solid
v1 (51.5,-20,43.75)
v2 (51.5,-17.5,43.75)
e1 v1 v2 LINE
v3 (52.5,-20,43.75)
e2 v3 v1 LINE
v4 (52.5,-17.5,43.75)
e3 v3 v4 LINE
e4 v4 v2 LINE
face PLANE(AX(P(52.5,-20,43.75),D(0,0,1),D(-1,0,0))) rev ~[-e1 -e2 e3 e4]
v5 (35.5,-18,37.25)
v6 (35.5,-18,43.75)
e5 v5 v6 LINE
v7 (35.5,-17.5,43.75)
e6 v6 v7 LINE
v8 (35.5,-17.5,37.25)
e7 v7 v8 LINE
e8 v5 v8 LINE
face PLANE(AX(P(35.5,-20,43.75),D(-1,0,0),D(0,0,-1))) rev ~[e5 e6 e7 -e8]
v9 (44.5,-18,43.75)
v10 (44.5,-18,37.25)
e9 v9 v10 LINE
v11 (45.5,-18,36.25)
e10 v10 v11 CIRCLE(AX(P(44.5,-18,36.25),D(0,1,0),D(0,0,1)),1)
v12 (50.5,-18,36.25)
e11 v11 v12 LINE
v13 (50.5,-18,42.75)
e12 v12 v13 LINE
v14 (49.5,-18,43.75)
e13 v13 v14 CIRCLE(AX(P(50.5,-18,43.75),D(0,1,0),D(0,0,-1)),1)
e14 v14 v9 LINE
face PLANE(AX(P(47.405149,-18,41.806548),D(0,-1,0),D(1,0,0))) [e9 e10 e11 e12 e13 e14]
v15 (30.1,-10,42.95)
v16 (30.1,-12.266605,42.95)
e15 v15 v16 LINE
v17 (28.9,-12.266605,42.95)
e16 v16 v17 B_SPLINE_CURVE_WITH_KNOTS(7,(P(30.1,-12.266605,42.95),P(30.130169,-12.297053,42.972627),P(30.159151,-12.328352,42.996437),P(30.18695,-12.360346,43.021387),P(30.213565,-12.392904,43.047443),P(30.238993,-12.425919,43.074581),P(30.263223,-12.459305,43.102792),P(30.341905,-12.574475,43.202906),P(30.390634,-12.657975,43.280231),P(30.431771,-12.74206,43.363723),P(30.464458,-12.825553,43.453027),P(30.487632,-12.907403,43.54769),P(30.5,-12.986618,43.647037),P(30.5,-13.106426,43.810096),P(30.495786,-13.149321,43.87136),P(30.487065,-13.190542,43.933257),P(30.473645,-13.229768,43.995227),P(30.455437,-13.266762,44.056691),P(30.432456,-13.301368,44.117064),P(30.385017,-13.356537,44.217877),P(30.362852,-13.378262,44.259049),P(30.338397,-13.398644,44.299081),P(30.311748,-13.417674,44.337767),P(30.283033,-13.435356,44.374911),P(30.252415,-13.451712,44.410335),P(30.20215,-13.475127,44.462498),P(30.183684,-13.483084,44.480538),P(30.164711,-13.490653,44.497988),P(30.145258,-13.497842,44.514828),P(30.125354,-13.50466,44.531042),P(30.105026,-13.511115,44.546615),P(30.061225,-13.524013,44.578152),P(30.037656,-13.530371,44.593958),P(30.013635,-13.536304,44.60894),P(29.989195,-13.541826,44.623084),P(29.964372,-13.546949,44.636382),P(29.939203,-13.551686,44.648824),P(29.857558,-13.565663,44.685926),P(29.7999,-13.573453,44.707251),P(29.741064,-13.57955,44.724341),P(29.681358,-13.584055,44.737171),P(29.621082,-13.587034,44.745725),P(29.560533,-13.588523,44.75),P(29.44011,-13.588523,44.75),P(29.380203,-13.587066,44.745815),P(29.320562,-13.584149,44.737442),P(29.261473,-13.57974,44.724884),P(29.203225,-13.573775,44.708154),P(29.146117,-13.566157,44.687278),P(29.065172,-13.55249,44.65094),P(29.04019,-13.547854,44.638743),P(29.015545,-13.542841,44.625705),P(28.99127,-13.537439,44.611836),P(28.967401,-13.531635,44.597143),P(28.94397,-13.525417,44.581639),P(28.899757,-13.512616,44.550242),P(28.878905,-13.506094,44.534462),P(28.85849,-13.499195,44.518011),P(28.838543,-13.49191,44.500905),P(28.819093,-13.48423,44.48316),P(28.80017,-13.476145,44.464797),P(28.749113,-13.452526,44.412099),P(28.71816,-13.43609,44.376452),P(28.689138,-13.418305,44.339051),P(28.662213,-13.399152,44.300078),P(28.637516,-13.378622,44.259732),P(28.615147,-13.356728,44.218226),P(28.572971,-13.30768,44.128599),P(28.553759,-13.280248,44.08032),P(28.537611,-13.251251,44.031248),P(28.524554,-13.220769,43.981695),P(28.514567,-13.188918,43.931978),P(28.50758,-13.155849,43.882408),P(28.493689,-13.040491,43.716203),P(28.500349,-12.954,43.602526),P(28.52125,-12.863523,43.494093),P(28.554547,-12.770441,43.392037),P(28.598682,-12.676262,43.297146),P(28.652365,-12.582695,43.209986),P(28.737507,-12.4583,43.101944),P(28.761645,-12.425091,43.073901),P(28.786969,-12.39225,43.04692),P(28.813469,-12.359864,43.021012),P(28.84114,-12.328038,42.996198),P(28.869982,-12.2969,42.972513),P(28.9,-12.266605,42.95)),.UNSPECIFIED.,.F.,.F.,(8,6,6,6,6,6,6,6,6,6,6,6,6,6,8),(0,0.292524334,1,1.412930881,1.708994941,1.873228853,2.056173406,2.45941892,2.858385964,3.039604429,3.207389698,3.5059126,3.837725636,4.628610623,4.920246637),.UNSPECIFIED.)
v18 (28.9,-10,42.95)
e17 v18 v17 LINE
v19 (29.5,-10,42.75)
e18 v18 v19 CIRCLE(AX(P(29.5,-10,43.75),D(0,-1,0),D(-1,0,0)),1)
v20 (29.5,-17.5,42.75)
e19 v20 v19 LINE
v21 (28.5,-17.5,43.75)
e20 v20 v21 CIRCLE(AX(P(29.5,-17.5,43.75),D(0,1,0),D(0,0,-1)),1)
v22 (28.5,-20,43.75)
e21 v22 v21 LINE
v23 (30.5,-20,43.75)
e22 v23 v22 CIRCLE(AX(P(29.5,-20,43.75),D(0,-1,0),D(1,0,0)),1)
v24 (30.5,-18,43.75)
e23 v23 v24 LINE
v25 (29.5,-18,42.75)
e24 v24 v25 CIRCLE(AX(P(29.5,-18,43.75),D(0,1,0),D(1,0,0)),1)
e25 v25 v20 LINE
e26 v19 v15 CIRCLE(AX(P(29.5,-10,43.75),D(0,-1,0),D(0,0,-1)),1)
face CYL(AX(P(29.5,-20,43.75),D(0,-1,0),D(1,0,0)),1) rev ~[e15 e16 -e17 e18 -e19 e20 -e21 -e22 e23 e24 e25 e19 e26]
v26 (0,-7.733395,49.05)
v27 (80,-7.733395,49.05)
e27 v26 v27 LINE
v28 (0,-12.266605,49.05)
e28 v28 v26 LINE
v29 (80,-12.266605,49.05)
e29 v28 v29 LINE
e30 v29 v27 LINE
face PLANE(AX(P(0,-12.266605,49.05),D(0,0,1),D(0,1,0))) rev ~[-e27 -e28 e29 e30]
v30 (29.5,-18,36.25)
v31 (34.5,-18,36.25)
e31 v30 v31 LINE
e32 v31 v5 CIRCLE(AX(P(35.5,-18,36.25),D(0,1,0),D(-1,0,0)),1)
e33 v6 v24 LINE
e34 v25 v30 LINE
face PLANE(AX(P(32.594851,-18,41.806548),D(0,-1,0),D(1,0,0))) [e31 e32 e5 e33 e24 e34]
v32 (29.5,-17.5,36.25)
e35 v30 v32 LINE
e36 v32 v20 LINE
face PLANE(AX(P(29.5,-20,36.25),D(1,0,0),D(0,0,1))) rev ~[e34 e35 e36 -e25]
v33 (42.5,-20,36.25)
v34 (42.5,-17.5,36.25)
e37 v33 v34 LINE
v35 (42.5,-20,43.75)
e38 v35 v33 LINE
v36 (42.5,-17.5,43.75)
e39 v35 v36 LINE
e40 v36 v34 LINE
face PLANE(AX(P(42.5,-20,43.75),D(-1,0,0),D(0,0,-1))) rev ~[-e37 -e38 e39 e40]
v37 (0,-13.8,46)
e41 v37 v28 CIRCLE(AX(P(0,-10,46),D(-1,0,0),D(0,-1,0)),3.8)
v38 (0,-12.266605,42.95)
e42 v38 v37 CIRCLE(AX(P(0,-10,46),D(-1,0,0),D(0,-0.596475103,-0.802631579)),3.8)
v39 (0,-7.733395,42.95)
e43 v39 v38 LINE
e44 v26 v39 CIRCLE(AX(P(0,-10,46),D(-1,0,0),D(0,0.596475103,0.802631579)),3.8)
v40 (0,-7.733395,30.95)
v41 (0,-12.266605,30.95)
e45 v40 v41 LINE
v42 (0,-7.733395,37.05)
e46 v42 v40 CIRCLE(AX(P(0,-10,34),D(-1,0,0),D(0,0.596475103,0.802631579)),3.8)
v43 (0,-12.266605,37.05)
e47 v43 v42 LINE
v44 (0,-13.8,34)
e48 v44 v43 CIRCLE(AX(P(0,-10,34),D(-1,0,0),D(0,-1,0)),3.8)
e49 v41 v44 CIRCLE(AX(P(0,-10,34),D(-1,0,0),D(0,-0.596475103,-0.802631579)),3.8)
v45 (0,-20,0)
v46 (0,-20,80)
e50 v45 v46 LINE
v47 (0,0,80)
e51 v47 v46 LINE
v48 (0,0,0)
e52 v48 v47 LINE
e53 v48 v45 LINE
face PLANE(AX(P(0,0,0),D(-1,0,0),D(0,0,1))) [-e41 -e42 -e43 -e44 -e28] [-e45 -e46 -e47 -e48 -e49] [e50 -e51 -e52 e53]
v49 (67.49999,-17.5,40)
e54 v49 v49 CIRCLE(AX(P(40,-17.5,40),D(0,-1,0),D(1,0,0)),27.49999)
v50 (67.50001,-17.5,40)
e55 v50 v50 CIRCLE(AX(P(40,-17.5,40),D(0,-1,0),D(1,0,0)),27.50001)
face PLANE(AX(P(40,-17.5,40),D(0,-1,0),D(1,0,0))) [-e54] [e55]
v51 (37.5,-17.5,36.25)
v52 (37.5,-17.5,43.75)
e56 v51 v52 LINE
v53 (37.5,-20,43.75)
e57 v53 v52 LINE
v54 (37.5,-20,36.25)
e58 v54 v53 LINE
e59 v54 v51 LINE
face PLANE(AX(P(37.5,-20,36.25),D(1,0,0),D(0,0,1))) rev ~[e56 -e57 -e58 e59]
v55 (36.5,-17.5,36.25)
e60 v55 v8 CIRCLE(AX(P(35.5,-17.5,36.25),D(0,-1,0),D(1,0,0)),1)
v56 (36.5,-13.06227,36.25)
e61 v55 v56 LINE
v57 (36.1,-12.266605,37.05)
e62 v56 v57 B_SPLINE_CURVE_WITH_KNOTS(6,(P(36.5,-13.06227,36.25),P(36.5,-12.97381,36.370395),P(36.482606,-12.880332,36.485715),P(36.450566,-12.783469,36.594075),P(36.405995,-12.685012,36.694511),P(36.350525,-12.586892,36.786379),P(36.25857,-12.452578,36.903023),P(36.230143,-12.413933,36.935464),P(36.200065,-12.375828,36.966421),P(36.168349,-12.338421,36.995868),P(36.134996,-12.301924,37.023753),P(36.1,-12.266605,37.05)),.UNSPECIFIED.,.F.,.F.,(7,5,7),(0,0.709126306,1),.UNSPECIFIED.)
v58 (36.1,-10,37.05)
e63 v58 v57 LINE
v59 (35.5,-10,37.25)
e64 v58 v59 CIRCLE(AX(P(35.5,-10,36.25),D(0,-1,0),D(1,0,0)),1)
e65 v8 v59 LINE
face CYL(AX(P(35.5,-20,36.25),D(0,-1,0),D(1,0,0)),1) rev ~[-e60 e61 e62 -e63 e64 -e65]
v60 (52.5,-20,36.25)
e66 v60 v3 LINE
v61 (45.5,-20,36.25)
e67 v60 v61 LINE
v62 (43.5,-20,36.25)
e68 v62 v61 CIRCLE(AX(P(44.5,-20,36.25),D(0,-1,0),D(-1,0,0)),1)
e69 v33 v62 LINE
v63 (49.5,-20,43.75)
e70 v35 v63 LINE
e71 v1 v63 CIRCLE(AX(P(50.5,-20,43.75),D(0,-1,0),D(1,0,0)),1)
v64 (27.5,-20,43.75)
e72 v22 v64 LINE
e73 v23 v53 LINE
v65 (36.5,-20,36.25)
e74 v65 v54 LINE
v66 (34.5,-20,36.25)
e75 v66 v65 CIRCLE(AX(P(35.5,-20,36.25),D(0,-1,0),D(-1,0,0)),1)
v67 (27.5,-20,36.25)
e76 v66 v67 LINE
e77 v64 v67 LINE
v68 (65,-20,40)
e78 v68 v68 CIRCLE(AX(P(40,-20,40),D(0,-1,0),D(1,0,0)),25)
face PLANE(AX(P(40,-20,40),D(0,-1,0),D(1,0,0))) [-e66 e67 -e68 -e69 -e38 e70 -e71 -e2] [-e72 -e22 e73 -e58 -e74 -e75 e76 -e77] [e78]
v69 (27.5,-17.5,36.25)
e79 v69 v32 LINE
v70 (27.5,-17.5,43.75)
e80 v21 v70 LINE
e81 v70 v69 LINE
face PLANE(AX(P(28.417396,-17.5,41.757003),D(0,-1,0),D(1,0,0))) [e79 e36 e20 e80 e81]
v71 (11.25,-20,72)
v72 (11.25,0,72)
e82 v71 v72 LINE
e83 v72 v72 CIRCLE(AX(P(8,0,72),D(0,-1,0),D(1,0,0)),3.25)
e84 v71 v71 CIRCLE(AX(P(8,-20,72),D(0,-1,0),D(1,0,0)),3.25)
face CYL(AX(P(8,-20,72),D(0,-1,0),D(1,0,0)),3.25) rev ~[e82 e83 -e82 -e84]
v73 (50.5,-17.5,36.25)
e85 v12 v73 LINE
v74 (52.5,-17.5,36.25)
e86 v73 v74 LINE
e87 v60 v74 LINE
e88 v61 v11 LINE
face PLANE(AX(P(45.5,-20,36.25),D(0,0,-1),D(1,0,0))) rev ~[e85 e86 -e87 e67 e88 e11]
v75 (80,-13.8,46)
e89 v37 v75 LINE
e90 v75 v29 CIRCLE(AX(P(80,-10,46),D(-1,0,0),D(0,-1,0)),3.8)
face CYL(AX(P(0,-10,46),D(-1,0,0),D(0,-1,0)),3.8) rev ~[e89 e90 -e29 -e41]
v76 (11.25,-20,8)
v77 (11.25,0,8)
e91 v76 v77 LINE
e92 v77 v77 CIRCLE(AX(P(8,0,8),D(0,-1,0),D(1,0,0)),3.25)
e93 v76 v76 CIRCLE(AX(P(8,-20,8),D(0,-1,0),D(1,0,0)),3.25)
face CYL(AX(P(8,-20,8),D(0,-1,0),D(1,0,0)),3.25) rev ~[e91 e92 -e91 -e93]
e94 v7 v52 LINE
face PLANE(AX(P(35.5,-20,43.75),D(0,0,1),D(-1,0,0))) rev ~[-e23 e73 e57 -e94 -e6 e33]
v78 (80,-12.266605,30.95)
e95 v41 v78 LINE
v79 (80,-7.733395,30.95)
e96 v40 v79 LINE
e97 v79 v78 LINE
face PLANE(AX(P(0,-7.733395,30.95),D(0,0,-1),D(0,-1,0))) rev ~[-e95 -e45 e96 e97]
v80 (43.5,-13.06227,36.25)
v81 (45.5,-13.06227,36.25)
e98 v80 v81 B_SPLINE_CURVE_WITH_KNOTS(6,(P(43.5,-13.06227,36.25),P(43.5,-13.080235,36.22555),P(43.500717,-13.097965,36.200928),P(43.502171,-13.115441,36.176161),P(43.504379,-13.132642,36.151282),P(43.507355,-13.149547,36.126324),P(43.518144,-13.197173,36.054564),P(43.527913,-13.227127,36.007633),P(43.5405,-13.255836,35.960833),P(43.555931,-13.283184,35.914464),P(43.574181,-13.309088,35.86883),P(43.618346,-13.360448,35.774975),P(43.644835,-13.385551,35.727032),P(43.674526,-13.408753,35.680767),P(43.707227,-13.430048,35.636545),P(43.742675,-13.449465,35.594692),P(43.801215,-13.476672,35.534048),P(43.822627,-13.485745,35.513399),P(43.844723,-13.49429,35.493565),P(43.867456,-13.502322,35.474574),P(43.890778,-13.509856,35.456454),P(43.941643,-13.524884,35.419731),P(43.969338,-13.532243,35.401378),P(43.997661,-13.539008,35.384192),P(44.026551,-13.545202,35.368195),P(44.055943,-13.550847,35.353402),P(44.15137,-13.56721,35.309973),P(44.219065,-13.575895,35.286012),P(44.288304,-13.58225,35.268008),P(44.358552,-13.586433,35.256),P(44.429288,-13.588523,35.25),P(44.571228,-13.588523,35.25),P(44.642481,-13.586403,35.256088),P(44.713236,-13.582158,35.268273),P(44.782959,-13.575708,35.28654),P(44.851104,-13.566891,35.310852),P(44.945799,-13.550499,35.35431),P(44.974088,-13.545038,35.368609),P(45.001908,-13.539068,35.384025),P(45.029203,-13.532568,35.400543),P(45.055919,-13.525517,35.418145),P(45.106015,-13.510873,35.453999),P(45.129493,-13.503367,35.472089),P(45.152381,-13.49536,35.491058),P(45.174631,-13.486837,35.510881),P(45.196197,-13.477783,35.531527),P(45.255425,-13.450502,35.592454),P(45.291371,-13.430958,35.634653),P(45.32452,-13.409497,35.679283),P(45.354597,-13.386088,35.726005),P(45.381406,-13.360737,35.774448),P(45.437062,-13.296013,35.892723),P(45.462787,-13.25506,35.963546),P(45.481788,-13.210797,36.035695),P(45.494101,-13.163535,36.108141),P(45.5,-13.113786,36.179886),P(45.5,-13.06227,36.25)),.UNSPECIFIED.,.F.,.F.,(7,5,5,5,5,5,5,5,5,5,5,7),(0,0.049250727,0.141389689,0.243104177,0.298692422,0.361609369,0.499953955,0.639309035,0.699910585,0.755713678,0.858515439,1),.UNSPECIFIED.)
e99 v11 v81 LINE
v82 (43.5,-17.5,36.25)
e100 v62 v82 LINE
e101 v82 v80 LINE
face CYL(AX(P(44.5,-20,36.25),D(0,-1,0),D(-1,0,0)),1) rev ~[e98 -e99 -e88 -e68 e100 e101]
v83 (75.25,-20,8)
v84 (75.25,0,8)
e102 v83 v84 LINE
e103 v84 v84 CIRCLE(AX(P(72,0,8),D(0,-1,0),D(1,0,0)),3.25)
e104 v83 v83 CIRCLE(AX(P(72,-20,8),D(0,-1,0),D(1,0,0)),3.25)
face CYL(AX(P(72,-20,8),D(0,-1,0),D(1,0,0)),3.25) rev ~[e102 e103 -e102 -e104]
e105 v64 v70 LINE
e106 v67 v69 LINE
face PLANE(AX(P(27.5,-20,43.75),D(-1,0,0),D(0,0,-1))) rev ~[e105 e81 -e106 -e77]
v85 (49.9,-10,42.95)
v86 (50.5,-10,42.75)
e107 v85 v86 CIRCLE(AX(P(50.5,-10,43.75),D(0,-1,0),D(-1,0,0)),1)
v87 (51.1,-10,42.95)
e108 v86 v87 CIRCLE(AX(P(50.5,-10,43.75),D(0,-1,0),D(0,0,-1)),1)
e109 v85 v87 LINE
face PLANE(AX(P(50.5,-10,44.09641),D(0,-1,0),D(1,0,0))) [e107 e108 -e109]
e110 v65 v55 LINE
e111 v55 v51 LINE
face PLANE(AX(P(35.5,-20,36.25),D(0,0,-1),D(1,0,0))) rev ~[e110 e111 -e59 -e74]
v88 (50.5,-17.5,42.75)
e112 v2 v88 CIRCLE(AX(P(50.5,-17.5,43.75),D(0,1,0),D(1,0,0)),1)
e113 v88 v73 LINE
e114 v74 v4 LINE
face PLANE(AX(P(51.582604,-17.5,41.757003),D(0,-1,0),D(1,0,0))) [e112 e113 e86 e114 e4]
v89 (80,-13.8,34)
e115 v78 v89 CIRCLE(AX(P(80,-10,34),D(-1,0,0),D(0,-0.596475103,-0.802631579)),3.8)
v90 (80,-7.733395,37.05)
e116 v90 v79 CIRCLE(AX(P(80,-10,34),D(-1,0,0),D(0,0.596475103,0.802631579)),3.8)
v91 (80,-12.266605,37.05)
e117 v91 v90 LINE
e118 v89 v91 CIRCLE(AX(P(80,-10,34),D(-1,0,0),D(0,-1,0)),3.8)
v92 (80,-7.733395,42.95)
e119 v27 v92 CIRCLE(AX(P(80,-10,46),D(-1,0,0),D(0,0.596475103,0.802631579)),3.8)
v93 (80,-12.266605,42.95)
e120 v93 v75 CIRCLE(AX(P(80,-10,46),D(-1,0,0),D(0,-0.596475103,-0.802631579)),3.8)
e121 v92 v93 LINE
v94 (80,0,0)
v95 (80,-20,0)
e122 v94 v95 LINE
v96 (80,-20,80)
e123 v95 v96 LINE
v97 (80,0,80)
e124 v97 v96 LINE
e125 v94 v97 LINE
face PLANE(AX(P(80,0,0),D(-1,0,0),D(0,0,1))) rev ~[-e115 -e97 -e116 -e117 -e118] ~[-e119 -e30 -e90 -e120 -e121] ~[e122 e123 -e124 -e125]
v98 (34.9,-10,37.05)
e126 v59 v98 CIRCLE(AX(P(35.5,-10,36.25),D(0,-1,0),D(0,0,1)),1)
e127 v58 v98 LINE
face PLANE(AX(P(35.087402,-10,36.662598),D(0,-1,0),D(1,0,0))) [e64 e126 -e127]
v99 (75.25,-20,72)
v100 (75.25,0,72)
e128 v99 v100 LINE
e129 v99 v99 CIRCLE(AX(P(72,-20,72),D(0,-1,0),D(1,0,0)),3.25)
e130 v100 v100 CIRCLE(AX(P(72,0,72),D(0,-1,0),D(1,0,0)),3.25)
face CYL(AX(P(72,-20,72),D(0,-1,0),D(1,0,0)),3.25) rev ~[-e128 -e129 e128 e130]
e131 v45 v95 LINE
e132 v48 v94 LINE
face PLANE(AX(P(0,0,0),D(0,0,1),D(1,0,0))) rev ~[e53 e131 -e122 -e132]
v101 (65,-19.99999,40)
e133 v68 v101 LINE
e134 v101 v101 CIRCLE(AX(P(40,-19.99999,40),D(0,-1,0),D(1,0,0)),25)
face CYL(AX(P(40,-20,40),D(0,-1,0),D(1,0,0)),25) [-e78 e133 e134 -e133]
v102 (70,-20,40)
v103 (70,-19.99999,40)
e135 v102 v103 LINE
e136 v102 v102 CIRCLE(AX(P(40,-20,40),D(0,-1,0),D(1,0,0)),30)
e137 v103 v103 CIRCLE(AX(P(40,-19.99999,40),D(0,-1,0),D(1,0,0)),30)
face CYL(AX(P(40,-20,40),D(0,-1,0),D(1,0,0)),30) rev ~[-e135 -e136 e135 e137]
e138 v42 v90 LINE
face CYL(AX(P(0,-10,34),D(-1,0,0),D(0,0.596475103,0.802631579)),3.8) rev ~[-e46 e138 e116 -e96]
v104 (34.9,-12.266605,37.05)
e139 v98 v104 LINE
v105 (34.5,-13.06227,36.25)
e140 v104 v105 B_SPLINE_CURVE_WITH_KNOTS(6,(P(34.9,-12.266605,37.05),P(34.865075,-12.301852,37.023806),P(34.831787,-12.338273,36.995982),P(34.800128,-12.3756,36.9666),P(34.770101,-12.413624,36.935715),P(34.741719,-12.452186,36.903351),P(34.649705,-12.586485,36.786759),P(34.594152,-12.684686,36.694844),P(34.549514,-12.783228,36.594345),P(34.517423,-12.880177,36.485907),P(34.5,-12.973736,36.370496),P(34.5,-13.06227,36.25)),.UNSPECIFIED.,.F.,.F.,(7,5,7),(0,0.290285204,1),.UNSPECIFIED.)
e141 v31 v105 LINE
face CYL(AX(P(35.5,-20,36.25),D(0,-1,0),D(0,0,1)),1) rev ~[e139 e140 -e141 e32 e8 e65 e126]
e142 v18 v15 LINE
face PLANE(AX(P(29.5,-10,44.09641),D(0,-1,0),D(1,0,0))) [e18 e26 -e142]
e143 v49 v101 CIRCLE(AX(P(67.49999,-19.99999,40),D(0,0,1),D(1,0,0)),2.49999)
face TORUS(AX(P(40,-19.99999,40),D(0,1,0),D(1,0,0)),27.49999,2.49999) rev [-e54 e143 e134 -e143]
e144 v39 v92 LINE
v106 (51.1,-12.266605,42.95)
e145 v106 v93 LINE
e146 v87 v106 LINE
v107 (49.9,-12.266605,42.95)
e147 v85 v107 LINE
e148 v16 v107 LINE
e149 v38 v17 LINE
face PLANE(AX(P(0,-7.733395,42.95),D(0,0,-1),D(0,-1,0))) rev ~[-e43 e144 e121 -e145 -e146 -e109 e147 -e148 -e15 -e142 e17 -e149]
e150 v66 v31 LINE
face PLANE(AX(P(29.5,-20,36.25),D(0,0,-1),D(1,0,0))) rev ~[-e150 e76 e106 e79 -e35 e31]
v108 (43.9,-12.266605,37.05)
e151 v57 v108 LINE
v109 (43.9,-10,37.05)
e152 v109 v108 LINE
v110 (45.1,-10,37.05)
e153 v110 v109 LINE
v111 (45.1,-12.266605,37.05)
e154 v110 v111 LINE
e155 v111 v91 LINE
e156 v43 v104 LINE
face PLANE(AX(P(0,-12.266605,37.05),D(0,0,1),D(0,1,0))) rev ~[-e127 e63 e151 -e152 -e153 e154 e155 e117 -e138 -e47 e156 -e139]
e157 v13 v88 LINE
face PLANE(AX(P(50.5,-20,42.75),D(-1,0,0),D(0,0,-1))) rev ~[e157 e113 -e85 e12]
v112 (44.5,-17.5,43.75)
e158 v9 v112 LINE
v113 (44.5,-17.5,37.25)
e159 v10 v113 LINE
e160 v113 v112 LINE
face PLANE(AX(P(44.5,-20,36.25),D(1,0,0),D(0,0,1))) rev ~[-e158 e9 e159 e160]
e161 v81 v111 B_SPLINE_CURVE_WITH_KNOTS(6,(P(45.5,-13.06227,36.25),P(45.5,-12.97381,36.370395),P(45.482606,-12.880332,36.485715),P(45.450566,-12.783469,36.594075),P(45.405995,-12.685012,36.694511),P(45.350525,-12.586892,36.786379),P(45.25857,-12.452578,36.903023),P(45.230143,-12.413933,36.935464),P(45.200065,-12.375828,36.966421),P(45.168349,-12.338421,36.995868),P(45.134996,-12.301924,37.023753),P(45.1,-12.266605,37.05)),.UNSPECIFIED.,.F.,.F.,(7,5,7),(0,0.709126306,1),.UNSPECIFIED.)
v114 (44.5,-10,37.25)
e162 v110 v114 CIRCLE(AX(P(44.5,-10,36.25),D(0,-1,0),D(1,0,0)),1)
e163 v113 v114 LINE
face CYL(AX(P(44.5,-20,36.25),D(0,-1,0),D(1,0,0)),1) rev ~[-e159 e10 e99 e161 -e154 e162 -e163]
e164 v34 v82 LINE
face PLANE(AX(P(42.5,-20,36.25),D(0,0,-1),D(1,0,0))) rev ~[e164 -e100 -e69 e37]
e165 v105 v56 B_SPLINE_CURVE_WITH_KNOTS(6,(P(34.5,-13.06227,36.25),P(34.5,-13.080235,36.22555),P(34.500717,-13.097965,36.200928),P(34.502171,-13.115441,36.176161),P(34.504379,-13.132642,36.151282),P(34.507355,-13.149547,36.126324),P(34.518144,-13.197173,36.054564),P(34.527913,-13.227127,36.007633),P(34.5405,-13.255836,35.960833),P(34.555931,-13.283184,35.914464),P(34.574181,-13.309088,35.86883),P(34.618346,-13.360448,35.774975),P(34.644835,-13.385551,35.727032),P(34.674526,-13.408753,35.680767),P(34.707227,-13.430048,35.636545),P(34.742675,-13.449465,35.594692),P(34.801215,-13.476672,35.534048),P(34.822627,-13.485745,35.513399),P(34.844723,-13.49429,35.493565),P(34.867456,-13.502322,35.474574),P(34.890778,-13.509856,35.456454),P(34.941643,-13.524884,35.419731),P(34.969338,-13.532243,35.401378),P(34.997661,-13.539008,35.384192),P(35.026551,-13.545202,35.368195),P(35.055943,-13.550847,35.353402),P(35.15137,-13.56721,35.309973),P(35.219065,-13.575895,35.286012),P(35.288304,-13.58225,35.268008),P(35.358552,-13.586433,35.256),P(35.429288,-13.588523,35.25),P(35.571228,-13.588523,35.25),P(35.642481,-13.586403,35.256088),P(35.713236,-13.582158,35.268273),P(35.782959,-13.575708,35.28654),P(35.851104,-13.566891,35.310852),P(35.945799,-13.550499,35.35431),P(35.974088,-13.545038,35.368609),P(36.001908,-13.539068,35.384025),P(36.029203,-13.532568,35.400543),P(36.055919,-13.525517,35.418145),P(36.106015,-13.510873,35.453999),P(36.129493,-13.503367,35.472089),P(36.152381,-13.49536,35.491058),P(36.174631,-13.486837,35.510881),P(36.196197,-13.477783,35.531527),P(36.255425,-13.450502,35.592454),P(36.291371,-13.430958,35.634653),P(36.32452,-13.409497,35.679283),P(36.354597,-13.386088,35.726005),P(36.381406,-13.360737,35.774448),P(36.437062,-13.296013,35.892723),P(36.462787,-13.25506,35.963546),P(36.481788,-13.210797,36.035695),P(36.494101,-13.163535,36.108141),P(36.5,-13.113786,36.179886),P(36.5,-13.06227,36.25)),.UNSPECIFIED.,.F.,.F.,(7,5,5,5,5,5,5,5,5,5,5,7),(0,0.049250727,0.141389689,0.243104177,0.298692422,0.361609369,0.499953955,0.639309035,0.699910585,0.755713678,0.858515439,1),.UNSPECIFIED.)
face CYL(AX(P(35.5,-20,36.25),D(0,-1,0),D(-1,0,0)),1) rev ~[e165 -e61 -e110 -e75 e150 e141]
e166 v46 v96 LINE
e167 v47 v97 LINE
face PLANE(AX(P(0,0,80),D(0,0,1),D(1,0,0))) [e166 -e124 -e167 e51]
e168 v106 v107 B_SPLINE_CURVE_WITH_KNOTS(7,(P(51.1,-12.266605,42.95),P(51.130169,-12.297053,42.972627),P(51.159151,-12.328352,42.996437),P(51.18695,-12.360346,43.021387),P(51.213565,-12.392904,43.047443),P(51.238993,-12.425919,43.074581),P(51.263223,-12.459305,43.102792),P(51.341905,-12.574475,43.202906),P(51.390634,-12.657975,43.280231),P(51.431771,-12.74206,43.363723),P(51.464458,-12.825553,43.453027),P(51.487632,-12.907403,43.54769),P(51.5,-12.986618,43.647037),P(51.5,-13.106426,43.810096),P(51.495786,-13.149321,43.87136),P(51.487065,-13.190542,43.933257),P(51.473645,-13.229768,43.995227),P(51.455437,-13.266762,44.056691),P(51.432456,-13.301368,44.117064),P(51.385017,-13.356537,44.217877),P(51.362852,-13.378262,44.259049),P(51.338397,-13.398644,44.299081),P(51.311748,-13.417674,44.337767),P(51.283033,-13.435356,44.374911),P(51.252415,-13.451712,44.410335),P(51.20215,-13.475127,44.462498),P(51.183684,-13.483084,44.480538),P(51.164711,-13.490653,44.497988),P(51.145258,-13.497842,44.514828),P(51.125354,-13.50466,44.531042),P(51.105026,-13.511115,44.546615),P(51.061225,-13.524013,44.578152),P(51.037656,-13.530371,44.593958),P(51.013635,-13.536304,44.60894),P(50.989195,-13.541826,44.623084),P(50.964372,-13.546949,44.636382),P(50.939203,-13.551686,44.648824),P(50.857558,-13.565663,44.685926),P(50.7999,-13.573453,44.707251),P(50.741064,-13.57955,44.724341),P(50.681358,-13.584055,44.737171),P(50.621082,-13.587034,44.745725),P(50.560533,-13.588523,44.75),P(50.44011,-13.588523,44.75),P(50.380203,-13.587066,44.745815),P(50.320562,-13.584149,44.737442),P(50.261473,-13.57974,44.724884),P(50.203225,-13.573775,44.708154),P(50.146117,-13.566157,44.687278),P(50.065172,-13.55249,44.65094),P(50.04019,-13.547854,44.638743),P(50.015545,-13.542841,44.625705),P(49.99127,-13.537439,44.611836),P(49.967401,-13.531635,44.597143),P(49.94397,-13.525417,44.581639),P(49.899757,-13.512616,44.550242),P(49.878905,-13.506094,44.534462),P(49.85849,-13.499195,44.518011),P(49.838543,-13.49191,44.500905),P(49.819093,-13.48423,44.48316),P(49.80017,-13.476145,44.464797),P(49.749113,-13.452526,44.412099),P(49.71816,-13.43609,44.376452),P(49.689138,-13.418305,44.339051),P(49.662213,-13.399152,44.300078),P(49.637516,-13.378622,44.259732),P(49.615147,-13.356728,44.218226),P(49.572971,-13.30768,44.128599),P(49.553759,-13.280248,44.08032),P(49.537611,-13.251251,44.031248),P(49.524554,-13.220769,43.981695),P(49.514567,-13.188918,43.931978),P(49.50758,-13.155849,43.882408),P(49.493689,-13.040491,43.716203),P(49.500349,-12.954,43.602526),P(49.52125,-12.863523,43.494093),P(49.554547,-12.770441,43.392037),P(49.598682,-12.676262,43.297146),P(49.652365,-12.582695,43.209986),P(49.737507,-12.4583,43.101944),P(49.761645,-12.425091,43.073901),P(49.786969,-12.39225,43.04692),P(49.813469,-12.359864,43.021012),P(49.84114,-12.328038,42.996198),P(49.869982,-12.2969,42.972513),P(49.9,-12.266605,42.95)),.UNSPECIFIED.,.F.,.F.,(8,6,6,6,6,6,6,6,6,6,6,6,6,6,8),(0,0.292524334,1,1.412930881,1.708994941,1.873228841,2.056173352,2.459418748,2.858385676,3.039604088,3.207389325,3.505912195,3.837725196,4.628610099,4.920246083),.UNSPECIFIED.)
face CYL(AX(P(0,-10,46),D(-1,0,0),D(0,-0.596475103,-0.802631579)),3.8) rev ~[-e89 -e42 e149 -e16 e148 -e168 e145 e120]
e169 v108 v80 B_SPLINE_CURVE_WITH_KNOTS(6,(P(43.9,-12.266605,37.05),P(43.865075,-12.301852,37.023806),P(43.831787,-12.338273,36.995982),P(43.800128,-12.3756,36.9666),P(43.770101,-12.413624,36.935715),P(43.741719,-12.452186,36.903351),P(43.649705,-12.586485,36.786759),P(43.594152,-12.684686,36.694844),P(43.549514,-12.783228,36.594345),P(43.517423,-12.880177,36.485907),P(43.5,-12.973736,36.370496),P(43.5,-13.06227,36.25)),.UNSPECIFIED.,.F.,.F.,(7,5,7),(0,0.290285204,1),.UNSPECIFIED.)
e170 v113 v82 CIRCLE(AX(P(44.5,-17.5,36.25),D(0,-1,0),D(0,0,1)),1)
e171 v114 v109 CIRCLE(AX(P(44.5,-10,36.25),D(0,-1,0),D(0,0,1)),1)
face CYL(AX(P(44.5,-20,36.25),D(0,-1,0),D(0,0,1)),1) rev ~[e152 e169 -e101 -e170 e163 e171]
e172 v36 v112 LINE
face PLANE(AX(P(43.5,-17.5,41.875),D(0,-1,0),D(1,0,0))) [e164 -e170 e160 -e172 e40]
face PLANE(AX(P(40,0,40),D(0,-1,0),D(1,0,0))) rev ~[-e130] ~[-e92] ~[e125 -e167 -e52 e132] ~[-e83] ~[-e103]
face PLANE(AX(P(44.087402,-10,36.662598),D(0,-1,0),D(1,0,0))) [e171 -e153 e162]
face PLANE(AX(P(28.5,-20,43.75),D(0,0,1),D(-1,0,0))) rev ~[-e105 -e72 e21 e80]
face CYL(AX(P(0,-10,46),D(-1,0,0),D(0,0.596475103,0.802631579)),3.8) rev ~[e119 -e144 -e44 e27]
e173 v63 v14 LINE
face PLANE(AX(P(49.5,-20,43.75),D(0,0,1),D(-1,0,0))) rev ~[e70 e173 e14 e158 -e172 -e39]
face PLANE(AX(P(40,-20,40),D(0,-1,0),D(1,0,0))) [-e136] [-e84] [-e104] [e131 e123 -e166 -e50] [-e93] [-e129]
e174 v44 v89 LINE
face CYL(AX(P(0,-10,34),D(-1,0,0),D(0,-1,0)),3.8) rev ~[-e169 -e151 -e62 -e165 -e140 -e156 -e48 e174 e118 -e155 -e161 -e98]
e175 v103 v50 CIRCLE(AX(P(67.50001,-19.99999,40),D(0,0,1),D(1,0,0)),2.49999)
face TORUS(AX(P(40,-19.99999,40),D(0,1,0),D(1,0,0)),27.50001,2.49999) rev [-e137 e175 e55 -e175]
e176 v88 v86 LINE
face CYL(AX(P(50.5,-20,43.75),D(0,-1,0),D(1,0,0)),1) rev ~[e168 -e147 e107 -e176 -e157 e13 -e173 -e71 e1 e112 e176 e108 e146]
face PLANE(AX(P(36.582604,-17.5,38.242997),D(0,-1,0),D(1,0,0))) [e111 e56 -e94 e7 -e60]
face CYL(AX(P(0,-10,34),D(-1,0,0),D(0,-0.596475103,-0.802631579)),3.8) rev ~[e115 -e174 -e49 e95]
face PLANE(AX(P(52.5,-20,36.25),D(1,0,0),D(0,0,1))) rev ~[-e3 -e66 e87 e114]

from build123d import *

# Parameters (mm, degrees)
F1_W      = 80
F1_H      = 80
F2_DEPTH  = 20
F4_R      = 3.25
F5_DEPTH  = 20.001
F4_R_2    = 30
F4_R_3    = 25
F6_DEPTH  = 2.5
F7_R      = 2.49999
F4_W      = 2
F4_H      = 3.75
F9_DEPTH  = 2.5
F10_DEPTH = 10
F12_DEPTH = 80.001
F13_DEPTH = 80.0010001
F14_DEPTH = 2


# Not quite as in the source:
# - two fillets or chamfers of one size are made in one step
# - a fillet or chamfer is up to 0.001 mm smaller than in the source, because OpenCascade refuses the exact size


with BuildPart() as f2:
    # F1 (on Front) → F2 (new body)
    with BuildSketch(Plane.XZ):
        with Locations((40, 40)):
            Rectangle(F1_W, F1_H)
    extrude(amount=F2_DEPTH)

    # F4 (on face) → F5 (cut, through all)
    with BuildSketch(Plane.XZ.offset(20)):
        with Locations((72, 8)):
            Circle(F4_R)
        with Locations((8, 8)):
            Circle(F4_R)
        with Locations((8, 72)):
            Circle(F4_R)
        with Locations((72, 72)):
            Circle(F4_R)
    extrude(amount=-F5_DEPTH, mode=Mode.SUBTRACT)

    # F4 (on face) → F6 (cut)
    with BuildSketch(Plane.XZ.offset(20)):
        with Locations((40, 40)):
            Circle(F4_R_2)
        with Locations((40, 40)):
            Circle(F4_R_3, mode=Mode.SUBTRACT)
    extrude(amount=-F6_DEPTH, mode=Mode.SUBTRACT)

    # F7 (radius 2.5 in the source; OpenCascade refuses exactly that, so slightly less here)
    f7_edges = [f2.edges().sort_by_distance(p)[0] for p in [
        (15, -17.5, 40),
        (10, -17.5, 40),
    ]]
    fillet(f7_edges, radius=F7_R)

    # F4 (on face) → F9 (cut)
    with BuildSketch(Plane.XZ.offset(20)):
        with BuildLine():
            Line((28.5, 43.75), (27.5, 43.75))
            Line((27.5, 43.75), (27.5, 40))
            Line((27.5, 40), (29.5, 40))
            Line((29.5, 40), (29.5, 42.75))
            ThreePointArc((29.5, 42.75), (28.7928932188, 43.0428932188), (28.5, 43.75))
        make_face()
        with Locations((28.5, 38.125)):
            Rectangle(F4_W, F4_H)
        with BuildLine():
            ThreePointArc((30.5, 43.75), (29.5, 44.75), (28.5, 43.75))
            Line((28.5, 43.75), (29.5, 43.75))
            Line((29.5, 43.75), (30.5, 43.75))
        make_face()
        with BuildLine():
            Line((52.5, 40), (52.5, 43.75))
            Line((52.5, 43.75), (51.5, 43.75))
            ThreePointArc((51.5, 43.75), (51.2071067812, 43.0428932188), (50.5, 42.75))
            Line((50.5, 42.75), (50.5, 40))
            Line((50.5, 40), (52.5, 40))
        make_face()
        with BuildLine():
            Line((37.5, 36.25), (37.5, 40))
            Line((37.5, 40), (35.5, 40))
            Line((35.5, 40), (35.5, 37.25))
            ThreePointArc((35.5, 37.25), (36.2071067812, 36.9571067812), (36.5, 36.25))
            Line((36.5, 36.25), (37.5, 36.25))
        make_face()
        with Locations((36.5, 41.875)):
            Rectangle(F4_W, F4_H)
        with Locations((43.5, 41.875)):
            Rectangle(F4_W, F4_H)
        with BuildLine():
            Line((44.5, 40), (42.5, 40))
            Line((42.5, 40), (42.5, 36.25))
            Line((42.5, 36.25), (43.5, 36.25))
            ThreePointArc((43.5, 36.25), (43.7928932188, 36.9571067812), (44.5, 37.25))
            Line((44.5, 37.25), (44.5, 40))
        make_face()
        with Locations((51.5, 38.125)):
            Rectangle(F4_W, F4_H)
        with BuildLine():
            Line((50.5, 43.75), (51.5, 43.75))
            ThreePointArc((51.5, 43.75), (50.5, 44.75), (49.5, 43.75))
            Line((49.5, 43.75), (50.5, 43.75))
        make_face()
        with BuildLine():
            ThreePointArc((36.5, 36.25), (36.2071067812, 36.9571067812), (35.5, 37.25))
            Line((35.5, 37.25), (35.5, 36.25))
            Line((35.5, 36.25), (36.5, 36.25))
        make_face()
        with BuildLine():
            Line((44.5, 36.25), (44.5, 37.25))
            ThreePointArc((44.5, 37.25), (43.7928932188, 36.9571067812), (43.5, 36.25))
            Line((43.5, 36.25), (44.5, 36.25))
        make_face()
    extrude(amount=-F9_DEPTH, mode=Mode.SUBTRACT)

    # F4 (on face) → F10 (cut)
    with BuildSketch(Plane.XZ.offset(20)):
        with BuildLine():
            ThreePointArc((30.5, 43.75), (29.5, 44.75), (28.5, 43.75))
            Line((28.5, 43.75), (29.5, 43.75))
            Line((29.5, 43.75), (30.5, 43.75))
        make_face()
        with BuildLine():
            Line((29.5, 43.75), (28.5, 43.75))
            ThreePointArc((28.5, 43.75), (28.7928932188, 43.0428932188), (29.5, 42.75))
            Line((29.5, 42.75), (29.5, 43.75))
        make_face()
        with BuildLine():
            Line((30.5, 43.75), (29.5, 43.75))
            Line((29.5, 43.75), (29.5, 42.75))
            ThreePointArc((29.5, 42.75), (30.2071067812, 43.0428932188), (30.5, 43.75))
        make_face()
        with BuildLine():
            Line((35.5, 36.25), (35.5, 37.25))
            ThreePointArc((35.5, 37.25), (34.7928932188, 36.9571067812), (34.5, 36.25))
            Line((34.5, 36.25), (35.5, 36.25))
        make_face()
        with BuildLine():
            ThreePointArc((36.5, 36.25), (36.2071067812, 36.9571067812), (35.5, 37.25))
            Line((35.5, 37.25), (35.5, 36.25))
            Line((35.5, 36.25), (36.5, 36.25))
        make_face()
        with BuildLine():
            ThreePointArc((34.5, 36.25), (35.5, 35.25), (36.5, 36.25))
            Line((36.5, 36.25), (35.5, 36.25))
            Line((35.5, 36.25), (34.5, 36.25))
        make_face()
        with BuildLine():
            Line((44.5, 36.25), (44.5, 37.25))
            ThreePointArc((44.5, 37.25), (43.7928932188, 36.9571067812), (43.5, 36.25))
            Line((43.5, 36.25), (44.5, 36.25))
        make_face()
        with BuildLine():
            ThreePointArc((45.5, 36.25), (45.2071067812, 36.9571067812), (44.5, 37.25))
            Line((44.5, 37.25), (44.5, 36.25))
            Line((44.5, 36.25), (45.5, 36.25))
        make_face()
        with BuildLine():
            Line((44.5, 36.25), (43.5, 36.25))
            ThreePointArc((43.5, 36.25), (44.5, 35.25), (45.5, 36.25))
            Line((45.5, 36.25), (44.5, 36.25))
        make_face()
        with BuildLine():
            Line((50.5, 43.75), (51.5, 43.75))
            ThreePointArc((51.5, 43.75), (50.5, 44.75), (49.5, 43.75))
            Line((49.5, 43.75), (50.5, 43.75))
        make_face()
        with BuildLine():
            Line((50.5, 42.75), (50.5, 43.75))
            Line((50.5, 43.75), (49.5, 43.75))
            ThreePointArc((49.5, 43.75), (49.7928932188, 43.0428932188), (50.5, 42.75))
        make_face()
        with BuildLine():
            ThreePointArc((50.5, 42.75), (51.2071067812, 43.0428932188), (51.5, 43.75))
            Line((51.5, 43.75), (50.5, 43.75))
            Line((50.5, 43.75), (50.5, 42.75))
        make_face()
    extrude(amount=-F10_DEPTH, mode=Mode.SUBTRACT)

    # F11 (on face) → F12 (cut, through all)
    with BuildSketch(Plane(origin=(0, 0, 0), x_dir=(0, -1, 0), z_dir=(-1, 0, 0))):
        with BuildLine():
            ThreePointArc((12.2666053913, 42.95), (13.3950773546, 44.293116947), (13.8, 46))
            ThreePointArc((13.8, 46), (13.3950773546, 47.706883053), (12.2666053913, 49.05))
            Line((12.2666053913, 49.05), (7.7333946087, 49.05))
            ThreePointArc((7.7333946087, 49.05), (6.2, 46), (7.7333946087, 42.95))
            Line((7.7333946087, 42.95), (12.2666053913, 42.95))
        make_face()
    extrude(amount=-F12_DEPTH, mode=Mode.SUBTRACT)

    # F11 (on face) → F13 (cut, through all)
    with BuildSketch(Plane(origin=(0, 0, 0), x_dir=(0, -1, 0), z_dir=(-1, 0, 0))):
        with BuildLine():
            ThreePointArc((12.2666053913, 42.95), (13.3950773546, 44.293116947), (13.8, 46))
            ThreePointArc((13.8, 46), (13.3950773546, 47.706883053), (12.2666053913, 49.05))
            Line((12.2666053913, 49.05), (7.7333946087, 49.05))
            ThreePointArc((7.7333946087, 49.05), (6.2, 46), (7.7333946087, 42.95))
            Line((7.7333946087, 42.95), (12.2666053913, 42.95))
        make_face()
        with BuildLine():
            ThreePointArc((12.2666053913, 30.95), (13.3950773546, 32.293116947), (13.8, 34))
            ThreePointArc((13.8, 34), (13.3950773546, 35.706883053), (12.2666053913, 37.05))
            Line((12.2666053913, 37.05), (7.7333946087, 37.05))
            ThreePointArc((7.7333946087, 37.05), (6.2, 34), (7.7333946087, 30.95))
            Line((7.7333946087, 30.95), (12.2666053913, 30.95))
        make_face()
    extrude(amount=-F13_DEPTH, mode=Mode.SUBTRACT)

    # F4 (on face) → F14 (cut)
    with BuildSketch(Plane.XZ.offset(20)):
        with BuildLine():
            Line((29.5, 42.75), (29.5, 40))
            Line((29.5, 40), (35.5, 40))
            Line((35.5, 40), (35.5, 43.75))
            Line((35.5, 43.75), (30.5, 43.75))
            ThreePointArc((30.5, 43.75), (30.2071067812, 43.0428932188), (29.5, 42.75))
        make_face()
        with BuildLine():
            Line((35.5, 40), (29.5, 40))
            Line((29.5, 40), (29.5, 36.25))
            Line((29.5, 36.25), (34.5, 36.25))
            ThreePointArc((34.5, 36.25), (34.7928932188, 36.9571067812), (35.5, 37.25))
            Line((35.5, 37.25), (35.5, 40))
        make_face()
        with BuildLine():
            Line((44.5, 43.75), (44.5, 40))
            Line((44.5, 40), (50.5, 40))
            Line((50.5, 40), (50.5, 42.75))
            ThreePointArc((50.5, 42.75), (49.7928932188, 43.0428932188), (49.5, 43.75))
            Line((49.5, 43.75), (44.5, 43.75))
        make_face()
        with BuildLine():
            Line((50.5, 40), (44.5, 40))
            Line((44.5, 40), (44.5, 37.25))
            ThreePointArc((44.5, 37.25), (45.2071067812, 36.9571067812), (45.5, 36.25))
            Line((45.5, 36.25), (50.5, 36.25))
            Line((50.5, 36.25), (50.5, 40))
        make_face()
    extrude(amount=-F14_DEPTH, mode=Mode.SUBTRACT)


solid = f2.part
